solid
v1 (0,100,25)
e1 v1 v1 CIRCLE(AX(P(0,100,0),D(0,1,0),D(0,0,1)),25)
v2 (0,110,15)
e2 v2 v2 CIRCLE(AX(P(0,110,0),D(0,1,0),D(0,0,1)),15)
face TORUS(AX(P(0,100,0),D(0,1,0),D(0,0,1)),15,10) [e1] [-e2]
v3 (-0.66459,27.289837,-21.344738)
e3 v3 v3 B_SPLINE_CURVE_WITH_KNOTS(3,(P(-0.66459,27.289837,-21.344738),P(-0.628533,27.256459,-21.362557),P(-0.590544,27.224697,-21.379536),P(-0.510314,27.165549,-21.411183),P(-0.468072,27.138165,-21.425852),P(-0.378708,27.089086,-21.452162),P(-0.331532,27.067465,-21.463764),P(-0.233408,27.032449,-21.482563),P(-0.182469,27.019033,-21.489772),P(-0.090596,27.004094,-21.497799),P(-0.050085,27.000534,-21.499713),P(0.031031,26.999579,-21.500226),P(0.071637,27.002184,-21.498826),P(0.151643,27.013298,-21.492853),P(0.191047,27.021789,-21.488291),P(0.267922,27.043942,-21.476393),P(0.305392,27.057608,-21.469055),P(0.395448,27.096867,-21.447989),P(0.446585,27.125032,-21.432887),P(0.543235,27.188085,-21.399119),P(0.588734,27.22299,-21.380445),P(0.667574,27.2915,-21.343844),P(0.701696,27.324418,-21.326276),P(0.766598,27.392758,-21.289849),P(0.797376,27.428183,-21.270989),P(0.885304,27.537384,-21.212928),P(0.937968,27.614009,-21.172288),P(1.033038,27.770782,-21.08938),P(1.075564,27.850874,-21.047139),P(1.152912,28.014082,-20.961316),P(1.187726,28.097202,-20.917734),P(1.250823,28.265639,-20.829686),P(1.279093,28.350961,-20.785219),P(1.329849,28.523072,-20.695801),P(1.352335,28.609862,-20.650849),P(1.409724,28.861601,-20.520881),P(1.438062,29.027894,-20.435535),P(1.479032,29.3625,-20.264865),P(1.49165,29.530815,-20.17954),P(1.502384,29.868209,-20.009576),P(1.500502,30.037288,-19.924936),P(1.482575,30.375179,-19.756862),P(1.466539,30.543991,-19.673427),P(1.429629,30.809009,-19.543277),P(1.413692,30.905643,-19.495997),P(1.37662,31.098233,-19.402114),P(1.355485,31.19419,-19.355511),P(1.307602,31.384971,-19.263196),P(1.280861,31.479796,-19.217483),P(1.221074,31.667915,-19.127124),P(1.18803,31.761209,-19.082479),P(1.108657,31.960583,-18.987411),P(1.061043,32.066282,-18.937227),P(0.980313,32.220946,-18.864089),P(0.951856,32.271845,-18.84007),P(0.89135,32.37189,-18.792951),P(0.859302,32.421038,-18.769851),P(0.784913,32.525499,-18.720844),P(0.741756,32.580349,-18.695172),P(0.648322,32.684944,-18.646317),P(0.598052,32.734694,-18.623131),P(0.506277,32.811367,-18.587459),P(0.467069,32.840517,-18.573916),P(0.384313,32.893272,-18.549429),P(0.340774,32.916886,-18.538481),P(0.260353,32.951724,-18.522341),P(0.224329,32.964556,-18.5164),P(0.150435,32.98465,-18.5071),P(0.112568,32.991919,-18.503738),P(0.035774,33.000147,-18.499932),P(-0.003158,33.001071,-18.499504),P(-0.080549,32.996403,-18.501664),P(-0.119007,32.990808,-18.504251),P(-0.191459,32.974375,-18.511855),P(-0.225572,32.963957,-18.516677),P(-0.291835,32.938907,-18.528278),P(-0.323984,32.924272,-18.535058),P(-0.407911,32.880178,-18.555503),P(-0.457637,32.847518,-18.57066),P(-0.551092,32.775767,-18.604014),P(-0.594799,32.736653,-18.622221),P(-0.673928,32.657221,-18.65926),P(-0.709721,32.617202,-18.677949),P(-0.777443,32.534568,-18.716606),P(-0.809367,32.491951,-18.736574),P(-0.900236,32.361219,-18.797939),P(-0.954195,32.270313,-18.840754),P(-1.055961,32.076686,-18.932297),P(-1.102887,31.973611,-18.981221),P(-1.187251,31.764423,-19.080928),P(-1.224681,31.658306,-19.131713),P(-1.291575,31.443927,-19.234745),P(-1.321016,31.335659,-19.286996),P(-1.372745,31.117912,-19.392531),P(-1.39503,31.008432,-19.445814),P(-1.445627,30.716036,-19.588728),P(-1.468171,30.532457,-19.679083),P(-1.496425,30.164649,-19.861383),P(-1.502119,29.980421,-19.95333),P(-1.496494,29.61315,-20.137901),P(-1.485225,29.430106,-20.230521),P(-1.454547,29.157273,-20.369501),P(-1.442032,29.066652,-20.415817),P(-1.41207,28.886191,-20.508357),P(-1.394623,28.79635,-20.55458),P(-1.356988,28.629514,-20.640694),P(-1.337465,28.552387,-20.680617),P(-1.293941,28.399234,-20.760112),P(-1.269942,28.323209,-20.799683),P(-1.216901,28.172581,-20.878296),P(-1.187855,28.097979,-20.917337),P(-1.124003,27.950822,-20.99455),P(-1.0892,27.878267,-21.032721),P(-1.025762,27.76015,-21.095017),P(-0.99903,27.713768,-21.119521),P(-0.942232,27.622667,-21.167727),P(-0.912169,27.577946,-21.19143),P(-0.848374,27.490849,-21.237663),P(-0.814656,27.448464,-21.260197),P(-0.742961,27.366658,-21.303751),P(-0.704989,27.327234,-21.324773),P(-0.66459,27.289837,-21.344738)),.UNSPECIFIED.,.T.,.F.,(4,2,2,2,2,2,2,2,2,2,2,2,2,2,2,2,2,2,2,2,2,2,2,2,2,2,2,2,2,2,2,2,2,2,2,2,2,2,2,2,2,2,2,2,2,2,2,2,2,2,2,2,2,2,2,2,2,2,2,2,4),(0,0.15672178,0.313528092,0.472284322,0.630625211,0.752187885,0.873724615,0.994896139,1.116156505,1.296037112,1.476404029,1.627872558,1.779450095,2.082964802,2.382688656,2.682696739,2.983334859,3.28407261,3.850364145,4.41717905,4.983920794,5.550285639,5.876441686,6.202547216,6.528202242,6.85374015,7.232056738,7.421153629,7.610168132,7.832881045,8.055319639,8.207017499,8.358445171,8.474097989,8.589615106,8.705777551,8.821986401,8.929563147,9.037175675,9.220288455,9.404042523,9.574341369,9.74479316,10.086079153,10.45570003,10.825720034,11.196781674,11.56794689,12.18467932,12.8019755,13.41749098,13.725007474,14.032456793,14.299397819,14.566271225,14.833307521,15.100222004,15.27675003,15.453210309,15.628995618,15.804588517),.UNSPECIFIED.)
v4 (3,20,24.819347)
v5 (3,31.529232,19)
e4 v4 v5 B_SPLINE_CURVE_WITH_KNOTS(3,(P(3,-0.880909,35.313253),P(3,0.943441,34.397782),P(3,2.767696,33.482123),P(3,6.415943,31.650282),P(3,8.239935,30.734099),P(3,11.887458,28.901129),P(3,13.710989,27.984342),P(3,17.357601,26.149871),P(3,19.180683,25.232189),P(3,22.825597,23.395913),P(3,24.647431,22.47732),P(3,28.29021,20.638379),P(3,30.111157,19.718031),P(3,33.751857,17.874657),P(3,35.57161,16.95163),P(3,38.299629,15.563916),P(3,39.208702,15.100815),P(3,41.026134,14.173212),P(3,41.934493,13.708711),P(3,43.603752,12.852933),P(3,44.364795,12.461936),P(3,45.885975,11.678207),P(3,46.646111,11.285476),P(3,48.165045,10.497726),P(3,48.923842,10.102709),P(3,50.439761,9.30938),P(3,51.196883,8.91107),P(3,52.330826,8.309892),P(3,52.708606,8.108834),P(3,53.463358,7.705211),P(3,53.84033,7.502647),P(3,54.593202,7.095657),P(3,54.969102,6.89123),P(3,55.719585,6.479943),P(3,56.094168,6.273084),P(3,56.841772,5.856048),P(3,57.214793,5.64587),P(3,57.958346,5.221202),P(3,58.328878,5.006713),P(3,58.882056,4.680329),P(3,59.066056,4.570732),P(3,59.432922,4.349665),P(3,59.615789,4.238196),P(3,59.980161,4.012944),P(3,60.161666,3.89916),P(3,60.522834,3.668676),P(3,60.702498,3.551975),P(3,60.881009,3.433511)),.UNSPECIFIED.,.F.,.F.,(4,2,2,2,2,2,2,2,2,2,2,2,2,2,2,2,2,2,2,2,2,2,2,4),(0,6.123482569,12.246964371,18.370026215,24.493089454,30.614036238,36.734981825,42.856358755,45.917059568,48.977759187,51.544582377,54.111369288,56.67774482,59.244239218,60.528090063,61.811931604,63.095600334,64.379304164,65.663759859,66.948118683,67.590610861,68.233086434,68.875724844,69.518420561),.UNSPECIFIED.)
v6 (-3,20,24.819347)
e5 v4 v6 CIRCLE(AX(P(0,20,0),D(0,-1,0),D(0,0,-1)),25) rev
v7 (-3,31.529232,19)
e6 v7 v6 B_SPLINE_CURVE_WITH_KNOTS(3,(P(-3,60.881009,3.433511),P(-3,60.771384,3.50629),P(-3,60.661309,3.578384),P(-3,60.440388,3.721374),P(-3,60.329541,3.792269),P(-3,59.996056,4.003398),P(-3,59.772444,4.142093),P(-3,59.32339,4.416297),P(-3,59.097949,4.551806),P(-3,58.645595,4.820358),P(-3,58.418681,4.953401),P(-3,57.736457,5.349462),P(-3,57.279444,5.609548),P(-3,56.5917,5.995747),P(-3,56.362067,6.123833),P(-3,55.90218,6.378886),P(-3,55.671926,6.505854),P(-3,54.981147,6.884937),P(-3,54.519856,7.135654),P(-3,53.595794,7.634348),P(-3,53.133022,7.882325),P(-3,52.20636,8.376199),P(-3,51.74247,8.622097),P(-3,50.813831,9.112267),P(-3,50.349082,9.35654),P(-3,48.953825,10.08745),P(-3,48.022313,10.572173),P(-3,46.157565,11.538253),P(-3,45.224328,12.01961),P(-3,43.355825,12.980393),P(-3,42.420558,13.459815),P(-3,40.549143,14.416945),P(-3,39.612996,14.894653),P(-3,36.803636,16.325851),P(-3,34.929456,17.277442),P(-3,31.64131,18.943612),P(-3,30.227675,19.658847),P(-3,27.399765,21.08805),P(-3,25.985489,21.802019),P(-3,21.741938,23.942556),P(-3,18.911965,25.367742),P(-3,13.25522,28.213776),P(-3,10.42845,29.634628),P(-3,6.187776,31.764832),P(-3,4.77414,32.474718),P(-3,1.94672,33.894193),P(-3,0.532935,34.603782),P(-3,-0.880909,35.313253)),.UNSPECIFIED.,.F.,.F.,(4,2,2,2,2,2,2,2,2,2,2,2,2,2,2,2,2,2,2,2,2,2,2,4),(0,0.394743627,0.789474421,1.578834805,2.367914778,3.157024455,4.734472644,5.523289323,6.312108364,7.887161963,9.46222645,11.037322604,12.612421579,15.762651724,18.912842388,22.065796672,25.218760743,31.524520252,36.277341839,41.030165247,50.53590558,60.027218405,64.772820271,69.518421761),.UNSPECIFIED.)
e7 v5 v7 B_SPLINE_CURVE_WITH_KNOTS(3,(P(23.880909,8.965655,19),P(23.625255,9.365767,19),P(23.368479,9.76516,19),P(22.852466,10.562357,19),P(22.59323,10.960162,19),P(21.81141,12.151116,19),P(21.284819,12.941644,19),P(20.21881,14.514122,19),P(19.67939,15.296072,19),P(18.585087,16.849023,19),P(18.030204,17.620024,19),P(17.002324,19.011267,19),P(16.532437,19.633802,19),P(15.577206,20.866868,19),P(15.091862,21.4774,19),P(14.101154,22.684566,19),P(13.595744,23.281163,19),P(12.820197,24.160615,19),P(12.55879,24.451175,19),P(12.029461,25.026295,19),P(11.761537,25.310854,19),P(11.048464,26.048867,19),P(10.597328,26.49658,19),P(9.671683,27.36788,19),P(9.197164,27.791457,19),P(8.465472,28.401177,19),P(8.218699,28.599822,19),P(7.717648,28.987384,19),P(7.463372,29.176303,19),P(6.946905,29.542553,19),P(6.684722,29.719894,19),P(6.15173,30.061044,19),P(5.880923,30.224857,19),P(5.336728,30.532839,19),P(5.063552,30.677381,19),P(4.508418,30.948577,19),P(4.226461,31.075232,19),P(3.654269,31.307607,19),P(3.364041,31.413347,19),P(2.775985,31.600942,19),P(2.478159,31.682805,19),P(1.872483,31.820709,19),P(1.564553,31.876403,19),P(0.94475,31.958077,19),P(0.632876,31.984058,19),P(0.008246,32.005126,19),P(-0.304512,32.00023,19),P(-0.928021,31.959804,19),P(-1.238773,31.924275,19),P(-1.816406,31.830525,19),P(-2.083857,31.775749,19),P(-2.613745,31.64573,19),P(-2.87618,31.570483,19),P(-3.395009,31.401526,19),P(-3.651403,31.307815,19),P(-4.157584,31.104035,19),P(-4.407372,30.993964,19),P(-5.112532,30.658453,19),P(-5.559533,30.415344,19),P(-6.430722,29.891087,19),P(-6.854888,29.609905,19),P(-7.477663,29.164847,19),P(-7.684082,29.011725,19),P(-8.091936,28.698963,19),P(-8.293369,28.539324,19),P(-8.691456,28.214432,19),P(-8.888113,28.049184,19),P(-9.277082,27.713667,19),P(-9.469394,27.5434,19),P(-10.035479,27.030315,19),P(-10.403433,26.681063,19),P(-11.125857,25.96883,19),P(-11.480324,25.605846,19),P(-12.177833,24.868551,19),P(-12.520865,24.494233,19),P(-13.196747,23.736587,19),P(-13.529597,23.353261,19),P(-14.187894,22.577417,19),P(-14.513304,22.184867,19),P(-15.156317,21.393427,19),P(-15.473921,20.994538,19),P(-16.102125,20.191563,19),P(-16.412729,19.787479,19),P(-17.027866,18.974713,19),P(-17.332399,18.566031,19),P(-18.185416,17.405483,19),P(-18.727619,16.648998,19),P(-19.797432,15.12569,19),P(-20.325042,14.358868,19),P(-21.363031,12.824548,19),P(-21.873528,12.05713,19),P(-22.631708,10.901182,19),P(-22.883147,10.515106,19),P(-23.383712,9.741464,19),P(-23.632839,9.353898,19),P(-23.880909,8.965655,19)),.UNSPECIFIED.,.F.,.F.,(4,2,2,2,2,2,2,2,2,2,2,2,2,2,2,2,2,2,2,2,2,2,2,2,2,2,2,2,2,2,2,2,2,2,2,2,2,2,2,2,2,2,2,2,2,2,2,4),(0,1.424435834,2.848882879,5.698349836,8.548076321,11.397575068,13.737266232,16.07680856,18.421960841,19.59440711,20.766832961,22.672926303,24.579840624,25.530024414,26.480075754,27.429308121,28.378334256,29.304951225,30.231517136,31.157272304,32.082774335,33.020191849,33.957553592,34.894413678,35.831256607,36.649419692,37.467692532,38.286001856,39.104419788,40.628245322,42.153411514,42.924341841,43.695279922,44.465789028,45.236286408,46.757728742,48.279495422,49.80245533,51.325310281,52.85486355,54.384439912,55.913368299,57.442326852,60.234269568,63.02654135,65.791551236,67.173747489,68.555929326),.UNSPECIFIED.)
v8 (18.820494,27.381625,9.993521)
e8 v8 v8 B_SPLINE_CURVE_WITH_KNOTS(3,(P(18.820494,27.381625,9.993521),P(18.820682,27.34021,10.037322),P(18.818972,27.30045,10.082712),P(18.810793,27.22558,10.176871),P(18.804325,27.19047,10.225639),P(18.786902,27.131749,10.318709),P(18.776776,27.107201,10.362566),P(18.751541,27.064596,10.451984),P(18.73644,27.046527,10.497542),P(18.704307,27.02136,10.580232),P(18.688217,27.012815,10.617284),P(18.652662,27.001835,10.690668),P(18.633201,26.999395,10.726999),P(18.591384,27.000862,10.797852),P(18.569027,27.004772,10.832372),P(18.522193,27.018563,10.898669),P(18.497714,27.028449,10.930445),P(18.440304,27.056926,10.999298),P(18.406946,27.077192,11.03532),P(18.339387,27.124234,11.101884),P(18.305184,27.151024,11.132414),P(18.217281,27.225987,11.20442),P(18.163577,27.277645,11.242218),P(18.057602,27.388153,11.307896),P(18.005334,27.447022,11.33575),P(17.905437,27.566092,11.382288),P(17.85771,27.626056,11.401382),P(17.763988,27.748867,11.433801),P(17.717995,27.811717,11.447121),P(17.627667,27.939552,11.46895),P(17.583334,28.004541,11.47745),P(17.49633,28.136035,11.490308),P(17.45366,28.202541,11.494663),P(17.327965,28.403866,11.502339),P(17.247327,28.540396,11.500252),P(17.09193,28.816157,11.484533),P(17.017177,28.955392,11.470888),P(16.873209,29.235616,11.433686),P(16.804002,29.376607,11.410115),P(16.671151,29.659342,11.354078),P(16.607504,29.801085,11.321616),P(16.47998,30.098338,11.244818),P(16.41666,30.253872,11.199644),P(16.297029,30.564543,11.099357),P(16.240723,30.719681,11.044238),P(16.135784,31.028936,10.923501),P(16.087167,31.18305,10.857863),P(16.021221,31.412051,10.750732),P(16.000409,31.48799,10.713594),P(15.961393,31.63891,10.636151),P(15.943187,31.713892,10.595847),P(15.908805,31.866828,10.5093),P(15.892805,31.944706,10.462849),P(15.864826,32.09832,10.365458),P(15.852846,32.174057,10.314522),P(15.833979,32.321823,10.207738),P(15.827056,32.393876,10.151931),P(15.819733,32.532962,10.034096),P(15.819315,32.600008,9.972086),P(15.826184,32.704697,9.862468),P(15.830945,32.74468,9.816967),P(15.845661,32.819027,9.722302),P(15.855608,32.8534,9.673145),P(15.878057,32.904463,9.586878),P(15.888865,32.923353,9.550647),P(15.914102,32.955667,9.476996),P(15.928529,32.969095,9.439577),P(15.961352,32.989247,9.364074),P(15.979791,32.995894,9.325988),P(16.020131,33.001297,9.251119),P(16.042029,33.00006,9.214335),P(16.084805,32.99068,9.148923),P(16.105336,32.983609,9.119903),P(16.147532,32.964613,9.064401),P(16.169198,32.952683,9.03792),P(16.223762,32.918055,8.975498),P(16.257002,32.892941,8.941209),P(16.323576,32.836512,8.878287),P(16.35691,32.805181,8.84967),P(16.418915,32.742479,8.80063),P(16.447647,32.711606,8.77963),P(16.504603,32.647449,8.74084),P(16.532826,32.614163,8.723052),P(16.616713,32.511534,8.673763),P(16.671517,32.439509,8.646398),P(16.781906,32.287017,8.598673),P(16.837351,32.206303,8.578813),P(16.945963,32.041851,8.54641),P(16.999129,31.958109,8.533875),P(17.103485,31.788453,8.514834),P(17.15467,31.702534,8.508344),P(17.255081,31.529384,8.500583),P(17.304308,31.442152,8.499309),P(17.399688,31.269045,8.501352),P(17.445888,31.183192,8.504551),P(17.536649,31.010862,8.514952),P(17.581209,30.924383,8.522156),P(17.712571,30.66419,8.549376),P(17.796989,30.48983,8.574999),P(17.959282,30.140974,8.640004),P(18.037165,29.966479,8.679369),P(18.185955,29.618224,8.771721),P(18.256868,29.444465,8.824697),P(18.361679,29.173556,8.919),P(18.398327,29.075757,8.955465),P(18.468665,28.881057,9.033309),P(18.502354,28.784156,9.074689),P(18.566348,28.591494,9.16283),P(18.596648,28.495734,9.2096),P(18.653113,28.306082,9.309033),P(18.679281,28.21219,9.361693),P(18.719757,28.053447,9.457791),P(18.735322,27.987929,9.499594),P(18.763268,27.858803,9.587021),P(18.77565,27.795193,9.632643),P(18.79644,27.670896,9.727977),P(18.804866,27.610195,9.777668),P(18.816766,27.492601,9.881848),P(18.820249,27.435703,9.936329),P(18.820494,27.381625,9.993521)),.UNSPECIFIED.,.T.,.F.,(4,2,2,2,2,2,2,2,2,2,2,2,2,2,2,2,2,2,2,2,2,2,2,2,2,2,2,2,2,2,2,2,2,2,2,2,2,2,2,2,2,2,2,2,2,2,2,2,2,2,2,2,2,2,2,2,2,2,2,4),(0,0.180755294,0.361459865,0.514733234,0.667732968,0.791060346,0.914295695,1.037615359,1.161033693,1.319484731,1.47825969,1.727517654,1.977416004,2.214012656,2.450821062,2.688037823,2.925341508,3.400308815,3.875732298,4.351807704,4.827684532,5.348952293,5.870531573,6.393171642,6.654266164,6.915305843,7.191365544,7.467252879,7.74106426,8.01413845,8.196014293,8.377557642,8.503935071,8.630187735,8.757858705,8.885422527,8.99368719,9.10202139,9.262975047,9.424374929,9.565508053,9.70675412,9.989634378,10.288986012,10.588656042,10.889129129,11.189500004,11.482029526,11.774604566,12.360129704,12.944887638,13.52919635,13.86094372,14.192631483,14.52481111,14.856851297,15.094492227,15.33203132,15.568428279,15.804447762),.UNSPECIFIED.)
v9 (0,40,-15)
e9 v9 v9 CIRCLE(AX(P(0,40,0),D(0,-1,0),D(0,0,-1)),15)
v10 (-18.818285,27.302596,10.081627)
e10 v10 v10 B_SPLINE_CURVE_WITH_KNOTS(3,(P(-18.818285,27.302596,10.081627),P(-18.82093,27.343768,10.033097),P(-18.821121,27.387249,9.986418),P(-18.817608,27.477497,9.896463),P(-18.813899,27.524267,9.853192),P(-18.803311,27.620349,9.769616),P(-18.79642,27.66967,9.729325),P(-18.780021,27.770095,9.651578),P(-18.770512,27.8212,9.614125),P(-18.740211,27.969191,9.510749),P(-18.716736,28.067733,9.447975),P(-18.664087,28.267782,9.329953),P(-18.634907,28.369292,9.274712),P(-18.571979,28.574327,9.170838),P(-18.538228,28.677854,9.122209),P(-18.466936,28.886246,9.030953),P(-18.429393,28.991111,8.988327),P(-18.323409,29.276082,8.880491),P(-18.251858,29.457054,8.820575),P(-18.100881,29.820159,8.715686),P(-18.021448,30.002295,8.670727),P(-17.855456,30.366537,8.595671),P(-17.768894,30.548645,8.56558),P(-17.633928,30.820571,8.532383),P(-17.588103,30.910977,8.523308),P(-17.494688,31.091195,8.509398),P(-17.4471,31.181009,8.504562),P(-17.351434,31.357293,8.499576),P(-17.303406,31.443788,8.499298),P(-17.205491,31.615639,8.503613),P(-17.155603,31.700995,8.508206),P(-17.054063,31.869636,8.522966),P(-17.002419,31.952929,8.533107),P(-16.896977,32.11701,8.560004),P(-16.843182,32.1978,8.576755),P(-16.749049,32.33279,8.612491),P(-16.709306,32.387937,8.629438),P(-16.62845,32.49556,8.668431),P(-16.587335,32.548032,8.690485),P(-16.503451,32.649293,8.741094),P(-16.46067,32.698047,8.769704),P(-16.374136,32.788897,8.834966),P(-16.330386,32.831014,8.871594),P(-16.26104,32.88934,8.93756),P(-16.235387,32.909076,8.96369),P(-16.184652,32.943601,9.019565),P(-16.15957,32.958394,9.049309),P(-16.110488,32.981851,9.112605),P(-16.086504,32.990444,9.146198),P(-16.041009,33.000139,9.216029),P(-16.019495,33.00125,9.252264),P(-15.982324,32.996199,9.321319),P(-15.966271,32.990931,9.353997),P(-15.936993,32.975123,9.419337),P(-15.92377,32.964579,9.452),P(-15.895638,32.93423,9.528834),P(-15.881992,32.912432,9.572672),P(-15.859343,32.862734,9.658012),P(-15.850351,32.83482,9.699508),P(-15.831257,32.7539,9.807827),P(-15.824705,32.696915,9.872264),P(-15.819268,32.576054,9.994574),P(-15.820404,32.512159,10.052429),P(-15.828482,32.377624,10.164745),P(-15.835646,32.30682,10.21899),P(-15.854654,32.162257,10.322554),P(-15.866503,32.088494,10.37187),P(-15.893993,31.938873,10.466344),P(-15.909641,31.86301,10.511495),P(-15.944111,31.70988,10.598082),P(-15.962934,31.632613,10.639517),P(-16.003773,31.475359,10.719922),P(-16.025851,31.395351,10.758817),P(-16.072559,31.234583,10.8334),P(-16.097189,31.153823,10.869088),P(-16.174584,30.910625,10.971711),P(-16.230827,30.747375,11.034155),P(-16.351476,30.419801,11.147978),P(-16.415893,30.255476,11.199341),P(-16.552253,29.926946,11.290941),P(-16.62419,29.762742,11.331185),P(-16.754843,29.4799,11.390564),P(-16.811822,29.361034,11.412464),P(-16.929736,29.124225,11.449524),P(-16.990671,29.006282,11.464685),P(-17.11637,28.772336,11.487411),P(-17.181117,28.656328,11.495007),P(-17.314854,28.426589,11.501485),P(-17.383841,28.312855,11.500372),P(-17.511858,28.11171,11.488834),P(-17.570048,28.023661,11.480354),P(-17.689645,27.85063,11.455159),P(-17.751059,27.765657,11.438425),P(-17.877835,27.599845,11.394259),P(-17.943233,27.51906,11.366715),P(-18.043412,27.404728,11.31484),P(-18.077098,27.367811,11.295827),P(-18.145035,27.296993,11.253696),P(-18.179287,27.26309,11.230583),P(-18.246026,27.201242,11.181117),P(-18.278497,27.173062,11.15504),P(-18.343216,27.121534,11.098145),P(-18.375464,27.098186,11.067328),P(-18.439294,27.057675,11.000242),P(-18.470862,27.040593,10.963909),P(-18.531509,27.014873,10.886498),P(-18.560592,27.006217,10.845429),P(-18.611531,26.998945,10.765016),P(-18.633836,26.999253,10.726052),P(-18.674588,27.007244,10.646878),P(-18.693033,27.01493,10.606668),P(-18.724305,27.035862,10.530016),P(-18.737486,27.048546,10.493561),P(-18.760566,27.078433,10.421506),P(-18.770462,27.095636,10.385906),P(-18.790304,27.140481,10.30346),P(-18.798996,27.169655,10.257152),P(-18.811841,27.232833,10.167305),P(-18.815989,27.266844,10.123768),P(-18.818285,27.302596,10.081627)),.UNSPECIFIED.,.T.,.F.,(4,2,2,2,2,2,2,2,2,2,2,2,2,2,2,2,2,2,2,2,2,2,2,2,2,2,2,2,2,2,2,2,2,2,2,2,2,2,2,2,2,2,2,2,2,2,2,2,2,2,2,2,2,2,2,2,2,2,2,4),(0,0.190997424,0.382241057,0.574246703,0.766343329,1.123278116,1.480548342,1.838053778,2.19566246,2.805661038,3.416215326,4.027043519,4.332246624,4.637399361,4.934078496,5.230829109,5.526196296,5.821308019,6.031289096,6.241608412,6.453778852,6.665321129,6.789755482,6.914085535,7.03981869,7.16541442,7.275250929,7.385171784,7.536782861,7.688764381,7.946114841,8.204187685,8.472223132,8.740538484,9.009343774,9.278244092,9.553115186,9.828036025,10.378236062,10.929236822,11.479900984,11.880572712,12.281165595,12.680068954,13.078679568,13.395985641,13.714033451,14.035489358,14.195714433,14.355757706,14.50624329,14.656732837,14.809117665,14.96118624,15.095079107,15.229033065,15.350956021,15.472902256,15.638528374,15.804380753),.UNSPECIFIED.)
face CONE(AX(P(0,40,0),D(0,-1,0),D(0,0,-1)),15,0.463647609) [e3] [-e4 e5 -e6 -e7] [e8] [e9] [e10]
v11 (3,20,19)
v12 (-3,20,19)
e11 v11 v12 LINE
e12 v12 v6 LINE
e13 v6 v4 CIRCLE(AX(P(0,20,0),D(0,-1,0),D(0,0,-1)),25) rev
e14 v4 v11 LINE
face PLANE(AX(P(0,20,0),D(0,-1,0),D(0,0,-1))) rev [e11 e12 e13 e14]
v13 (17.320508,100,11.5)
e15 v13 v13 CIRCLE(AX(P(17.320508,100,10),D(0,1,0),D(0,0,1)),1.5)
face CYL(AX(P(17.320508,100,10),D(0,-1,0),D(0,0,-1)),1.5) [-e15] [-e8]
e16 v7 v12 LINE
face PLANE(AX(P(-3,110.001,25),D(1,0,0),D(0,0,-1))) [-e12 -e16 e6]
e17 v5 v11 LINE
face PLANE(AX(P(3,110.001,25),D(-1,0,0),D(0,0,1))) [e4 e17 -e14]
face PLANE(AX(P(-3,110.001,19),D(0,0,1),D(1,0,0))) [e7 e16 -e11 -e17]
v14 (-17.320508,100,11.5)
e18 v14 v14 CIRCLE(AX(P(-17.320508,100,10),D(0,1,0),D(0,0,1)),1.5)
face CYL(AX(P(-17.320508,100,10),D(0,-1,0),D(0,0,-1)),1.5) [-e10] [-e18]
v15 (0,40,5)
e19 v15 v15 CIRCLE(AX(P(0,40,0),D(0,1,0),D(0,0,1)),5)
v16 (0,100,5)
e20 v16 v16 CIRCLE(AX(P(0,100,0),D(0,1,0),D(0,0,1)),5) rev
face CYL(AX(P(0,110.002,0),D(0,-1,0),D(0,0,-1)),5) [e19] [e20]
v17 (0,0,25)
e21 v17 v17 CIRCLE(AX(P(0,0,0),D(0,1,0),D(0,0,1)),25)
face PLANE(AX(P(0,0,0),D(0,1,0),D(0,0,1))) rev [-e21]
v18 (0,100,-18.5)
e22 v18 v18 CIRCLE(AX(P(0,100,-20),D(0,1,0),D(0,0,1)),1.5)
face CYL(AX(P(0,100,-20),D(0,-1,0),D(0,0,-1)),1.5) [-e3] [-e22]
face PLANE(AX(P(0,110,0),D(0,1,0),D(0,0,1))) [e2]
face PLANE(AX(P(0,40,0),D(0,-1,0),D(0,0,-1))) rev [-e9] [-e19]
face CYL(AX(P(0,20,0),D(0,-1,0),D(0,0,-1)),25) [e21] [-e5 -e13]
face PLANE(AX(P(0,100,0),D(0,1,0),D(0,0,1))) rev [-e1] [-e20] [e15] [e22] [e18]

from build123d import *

# Parameters (mm, degrees)
SKETCH1_R             = 25
BOTTOM_CYLINDER_DEPTH = 20
SKETCH3_R             = 15
SKETCH2_R             = 25
SKETCH5_R             = 1.5
UVC_RODS_DEPTH        = 80
SKETCH6_R             = 25
TOP_DEPTH             = 10
FILLET1_R             = 10
LIDAR_CUBBY_REACH     = 98.695
SKETCH8_W             = 6
SKETCH8_H             = 6
BOSS_EXTRUDE1_REACH   = 80.422
SKETCH9_R             = 5


with BuildPart() as part:
    # Sketch1 → Bottom-cylinder (new body)
    with BuildSketch(Plane(origin=(0, 0, 0), x_dir=(1, 0, 0), z_dir=(0, 1, 0))):
        with Locations(Location((0, 0, 0), (0, 0, 270))):
            Circle(SKETCH1_R)
    extrude(amount=BOTTOM_CYLINDER_DEPTH)

    # Sketch3 → Cone-top section 0
    with BuildSketch(Plane(origin=(0, 40, 0), x_dir=(-1, 0, 0), z_dir=(0, -1, 0))):
        Circle(SKETCH3_R)
    # Sketch2 → Cone-top section 1
    with BuildSketch(Plane(origin=(0, 20, 0), x_dir=(1, 0, 0), z_dir=(0, 1, 0))):
        Circle(SKETCH2_R)
    loft()

    # Sketch5 → UVC-rods (add)
    with BuildSketch(Plane(origin=(0, 20, 0), x_dir=(1, 0, 0), z_dir=(0, 1, 0))):
        with Locations(Location((0, 20, 0), (0, 0, 90.000009577))):
            Circle(SKETCH5_R)
        with Locations(Location((17.320508076, -10, 0), (0, 0, 0.247467178))):
            Circle(SKETCH5_R)
        with Locations(Location((-17.320508076, -10, 0), (0, 0, 183.11947614))):
            Circle(SKETCH5_R)
    extrude(amount=UVC_RODS_DEPTH)

    # Sketch6 → Top (add)
    with BuildSketch(Plane(origin=(0, 100, 0), x_dir=(1, 0, 0), z_dir=(0, 1, 0))):
        with Locations(Location((0, 0, 0), (0, 0, 90))):
            Circle(SKETCH6_R)
    extrude(amount=TOP_DEPTH)

    # Fillet1
    fillet1_edges = [part.edges().sort_by_distance(p)[0] for p in [
        (0, 110, 25),
    ]]
    fillet(fillet1_edges, radius=FILLET1_R - 0.0001)  # a hair under: the kernel refuses the full size

    # Lidar-cubby: up to this cone (the profile starts inside it)
    lidar_cubby_end = Plane(origin=(0, 20, 0), z_dir=(0, -1, 0)).offset(-49.999999) * Cone(1e-06, 87.0975, 174.194999, align=(Align.CENTER, Align.CENTER, Align.MIN), mode=Mode.PRIVATE)
    # Sketch8 → Lidar-cubby (cut, up to the surface)
    with BuildSketch(Plane(origin=(0, 20, 0), x_dir=(1, 0, 0), z_dir=(0, 1, 0)), mode=Mode.PRIVATE) as lidar_cubby_sk1:
        with Locations((0, -22)):
            Rectangle(SKETCH8_W, SKETCH8_H)
    lidar_cubby_tool1 = extrude(lidar_cubby_sk1.sketch, amount=LIDAR_CUBBY_REACH, mode=Mode.PRIVATE) & lidar_cubby_end
    add(lidar_cubby_tool1.solids().sort_by_distance((0, 20, 22))[0], mode=Mode.SUBTRACT)

    # Sketch9 → Boss-Extrude1 (add, up to next)
    with BuildSketch(Plane(origin=(0, 40, 0), x_dir=(1, 0, 0), z_dir=(0, 1, 0)), mode=Mode.PRIVATE) as boss_extrude1_sk1:
        with Locations(Location((0, 0, 0), (0, 0, 270))):
            Circle(SKETCH9_R)
    boss_extrude1_tool1 = extrude(boss_extrude1_sk1.sketch, amount=BOSS_EXTRUDE1_REACH, mode=Mode.PRIVATE) - part.part
    add(boss_extrude1_tool1.solids().sort_by_distance((0, 40, 0))[0])


solid = part.part
